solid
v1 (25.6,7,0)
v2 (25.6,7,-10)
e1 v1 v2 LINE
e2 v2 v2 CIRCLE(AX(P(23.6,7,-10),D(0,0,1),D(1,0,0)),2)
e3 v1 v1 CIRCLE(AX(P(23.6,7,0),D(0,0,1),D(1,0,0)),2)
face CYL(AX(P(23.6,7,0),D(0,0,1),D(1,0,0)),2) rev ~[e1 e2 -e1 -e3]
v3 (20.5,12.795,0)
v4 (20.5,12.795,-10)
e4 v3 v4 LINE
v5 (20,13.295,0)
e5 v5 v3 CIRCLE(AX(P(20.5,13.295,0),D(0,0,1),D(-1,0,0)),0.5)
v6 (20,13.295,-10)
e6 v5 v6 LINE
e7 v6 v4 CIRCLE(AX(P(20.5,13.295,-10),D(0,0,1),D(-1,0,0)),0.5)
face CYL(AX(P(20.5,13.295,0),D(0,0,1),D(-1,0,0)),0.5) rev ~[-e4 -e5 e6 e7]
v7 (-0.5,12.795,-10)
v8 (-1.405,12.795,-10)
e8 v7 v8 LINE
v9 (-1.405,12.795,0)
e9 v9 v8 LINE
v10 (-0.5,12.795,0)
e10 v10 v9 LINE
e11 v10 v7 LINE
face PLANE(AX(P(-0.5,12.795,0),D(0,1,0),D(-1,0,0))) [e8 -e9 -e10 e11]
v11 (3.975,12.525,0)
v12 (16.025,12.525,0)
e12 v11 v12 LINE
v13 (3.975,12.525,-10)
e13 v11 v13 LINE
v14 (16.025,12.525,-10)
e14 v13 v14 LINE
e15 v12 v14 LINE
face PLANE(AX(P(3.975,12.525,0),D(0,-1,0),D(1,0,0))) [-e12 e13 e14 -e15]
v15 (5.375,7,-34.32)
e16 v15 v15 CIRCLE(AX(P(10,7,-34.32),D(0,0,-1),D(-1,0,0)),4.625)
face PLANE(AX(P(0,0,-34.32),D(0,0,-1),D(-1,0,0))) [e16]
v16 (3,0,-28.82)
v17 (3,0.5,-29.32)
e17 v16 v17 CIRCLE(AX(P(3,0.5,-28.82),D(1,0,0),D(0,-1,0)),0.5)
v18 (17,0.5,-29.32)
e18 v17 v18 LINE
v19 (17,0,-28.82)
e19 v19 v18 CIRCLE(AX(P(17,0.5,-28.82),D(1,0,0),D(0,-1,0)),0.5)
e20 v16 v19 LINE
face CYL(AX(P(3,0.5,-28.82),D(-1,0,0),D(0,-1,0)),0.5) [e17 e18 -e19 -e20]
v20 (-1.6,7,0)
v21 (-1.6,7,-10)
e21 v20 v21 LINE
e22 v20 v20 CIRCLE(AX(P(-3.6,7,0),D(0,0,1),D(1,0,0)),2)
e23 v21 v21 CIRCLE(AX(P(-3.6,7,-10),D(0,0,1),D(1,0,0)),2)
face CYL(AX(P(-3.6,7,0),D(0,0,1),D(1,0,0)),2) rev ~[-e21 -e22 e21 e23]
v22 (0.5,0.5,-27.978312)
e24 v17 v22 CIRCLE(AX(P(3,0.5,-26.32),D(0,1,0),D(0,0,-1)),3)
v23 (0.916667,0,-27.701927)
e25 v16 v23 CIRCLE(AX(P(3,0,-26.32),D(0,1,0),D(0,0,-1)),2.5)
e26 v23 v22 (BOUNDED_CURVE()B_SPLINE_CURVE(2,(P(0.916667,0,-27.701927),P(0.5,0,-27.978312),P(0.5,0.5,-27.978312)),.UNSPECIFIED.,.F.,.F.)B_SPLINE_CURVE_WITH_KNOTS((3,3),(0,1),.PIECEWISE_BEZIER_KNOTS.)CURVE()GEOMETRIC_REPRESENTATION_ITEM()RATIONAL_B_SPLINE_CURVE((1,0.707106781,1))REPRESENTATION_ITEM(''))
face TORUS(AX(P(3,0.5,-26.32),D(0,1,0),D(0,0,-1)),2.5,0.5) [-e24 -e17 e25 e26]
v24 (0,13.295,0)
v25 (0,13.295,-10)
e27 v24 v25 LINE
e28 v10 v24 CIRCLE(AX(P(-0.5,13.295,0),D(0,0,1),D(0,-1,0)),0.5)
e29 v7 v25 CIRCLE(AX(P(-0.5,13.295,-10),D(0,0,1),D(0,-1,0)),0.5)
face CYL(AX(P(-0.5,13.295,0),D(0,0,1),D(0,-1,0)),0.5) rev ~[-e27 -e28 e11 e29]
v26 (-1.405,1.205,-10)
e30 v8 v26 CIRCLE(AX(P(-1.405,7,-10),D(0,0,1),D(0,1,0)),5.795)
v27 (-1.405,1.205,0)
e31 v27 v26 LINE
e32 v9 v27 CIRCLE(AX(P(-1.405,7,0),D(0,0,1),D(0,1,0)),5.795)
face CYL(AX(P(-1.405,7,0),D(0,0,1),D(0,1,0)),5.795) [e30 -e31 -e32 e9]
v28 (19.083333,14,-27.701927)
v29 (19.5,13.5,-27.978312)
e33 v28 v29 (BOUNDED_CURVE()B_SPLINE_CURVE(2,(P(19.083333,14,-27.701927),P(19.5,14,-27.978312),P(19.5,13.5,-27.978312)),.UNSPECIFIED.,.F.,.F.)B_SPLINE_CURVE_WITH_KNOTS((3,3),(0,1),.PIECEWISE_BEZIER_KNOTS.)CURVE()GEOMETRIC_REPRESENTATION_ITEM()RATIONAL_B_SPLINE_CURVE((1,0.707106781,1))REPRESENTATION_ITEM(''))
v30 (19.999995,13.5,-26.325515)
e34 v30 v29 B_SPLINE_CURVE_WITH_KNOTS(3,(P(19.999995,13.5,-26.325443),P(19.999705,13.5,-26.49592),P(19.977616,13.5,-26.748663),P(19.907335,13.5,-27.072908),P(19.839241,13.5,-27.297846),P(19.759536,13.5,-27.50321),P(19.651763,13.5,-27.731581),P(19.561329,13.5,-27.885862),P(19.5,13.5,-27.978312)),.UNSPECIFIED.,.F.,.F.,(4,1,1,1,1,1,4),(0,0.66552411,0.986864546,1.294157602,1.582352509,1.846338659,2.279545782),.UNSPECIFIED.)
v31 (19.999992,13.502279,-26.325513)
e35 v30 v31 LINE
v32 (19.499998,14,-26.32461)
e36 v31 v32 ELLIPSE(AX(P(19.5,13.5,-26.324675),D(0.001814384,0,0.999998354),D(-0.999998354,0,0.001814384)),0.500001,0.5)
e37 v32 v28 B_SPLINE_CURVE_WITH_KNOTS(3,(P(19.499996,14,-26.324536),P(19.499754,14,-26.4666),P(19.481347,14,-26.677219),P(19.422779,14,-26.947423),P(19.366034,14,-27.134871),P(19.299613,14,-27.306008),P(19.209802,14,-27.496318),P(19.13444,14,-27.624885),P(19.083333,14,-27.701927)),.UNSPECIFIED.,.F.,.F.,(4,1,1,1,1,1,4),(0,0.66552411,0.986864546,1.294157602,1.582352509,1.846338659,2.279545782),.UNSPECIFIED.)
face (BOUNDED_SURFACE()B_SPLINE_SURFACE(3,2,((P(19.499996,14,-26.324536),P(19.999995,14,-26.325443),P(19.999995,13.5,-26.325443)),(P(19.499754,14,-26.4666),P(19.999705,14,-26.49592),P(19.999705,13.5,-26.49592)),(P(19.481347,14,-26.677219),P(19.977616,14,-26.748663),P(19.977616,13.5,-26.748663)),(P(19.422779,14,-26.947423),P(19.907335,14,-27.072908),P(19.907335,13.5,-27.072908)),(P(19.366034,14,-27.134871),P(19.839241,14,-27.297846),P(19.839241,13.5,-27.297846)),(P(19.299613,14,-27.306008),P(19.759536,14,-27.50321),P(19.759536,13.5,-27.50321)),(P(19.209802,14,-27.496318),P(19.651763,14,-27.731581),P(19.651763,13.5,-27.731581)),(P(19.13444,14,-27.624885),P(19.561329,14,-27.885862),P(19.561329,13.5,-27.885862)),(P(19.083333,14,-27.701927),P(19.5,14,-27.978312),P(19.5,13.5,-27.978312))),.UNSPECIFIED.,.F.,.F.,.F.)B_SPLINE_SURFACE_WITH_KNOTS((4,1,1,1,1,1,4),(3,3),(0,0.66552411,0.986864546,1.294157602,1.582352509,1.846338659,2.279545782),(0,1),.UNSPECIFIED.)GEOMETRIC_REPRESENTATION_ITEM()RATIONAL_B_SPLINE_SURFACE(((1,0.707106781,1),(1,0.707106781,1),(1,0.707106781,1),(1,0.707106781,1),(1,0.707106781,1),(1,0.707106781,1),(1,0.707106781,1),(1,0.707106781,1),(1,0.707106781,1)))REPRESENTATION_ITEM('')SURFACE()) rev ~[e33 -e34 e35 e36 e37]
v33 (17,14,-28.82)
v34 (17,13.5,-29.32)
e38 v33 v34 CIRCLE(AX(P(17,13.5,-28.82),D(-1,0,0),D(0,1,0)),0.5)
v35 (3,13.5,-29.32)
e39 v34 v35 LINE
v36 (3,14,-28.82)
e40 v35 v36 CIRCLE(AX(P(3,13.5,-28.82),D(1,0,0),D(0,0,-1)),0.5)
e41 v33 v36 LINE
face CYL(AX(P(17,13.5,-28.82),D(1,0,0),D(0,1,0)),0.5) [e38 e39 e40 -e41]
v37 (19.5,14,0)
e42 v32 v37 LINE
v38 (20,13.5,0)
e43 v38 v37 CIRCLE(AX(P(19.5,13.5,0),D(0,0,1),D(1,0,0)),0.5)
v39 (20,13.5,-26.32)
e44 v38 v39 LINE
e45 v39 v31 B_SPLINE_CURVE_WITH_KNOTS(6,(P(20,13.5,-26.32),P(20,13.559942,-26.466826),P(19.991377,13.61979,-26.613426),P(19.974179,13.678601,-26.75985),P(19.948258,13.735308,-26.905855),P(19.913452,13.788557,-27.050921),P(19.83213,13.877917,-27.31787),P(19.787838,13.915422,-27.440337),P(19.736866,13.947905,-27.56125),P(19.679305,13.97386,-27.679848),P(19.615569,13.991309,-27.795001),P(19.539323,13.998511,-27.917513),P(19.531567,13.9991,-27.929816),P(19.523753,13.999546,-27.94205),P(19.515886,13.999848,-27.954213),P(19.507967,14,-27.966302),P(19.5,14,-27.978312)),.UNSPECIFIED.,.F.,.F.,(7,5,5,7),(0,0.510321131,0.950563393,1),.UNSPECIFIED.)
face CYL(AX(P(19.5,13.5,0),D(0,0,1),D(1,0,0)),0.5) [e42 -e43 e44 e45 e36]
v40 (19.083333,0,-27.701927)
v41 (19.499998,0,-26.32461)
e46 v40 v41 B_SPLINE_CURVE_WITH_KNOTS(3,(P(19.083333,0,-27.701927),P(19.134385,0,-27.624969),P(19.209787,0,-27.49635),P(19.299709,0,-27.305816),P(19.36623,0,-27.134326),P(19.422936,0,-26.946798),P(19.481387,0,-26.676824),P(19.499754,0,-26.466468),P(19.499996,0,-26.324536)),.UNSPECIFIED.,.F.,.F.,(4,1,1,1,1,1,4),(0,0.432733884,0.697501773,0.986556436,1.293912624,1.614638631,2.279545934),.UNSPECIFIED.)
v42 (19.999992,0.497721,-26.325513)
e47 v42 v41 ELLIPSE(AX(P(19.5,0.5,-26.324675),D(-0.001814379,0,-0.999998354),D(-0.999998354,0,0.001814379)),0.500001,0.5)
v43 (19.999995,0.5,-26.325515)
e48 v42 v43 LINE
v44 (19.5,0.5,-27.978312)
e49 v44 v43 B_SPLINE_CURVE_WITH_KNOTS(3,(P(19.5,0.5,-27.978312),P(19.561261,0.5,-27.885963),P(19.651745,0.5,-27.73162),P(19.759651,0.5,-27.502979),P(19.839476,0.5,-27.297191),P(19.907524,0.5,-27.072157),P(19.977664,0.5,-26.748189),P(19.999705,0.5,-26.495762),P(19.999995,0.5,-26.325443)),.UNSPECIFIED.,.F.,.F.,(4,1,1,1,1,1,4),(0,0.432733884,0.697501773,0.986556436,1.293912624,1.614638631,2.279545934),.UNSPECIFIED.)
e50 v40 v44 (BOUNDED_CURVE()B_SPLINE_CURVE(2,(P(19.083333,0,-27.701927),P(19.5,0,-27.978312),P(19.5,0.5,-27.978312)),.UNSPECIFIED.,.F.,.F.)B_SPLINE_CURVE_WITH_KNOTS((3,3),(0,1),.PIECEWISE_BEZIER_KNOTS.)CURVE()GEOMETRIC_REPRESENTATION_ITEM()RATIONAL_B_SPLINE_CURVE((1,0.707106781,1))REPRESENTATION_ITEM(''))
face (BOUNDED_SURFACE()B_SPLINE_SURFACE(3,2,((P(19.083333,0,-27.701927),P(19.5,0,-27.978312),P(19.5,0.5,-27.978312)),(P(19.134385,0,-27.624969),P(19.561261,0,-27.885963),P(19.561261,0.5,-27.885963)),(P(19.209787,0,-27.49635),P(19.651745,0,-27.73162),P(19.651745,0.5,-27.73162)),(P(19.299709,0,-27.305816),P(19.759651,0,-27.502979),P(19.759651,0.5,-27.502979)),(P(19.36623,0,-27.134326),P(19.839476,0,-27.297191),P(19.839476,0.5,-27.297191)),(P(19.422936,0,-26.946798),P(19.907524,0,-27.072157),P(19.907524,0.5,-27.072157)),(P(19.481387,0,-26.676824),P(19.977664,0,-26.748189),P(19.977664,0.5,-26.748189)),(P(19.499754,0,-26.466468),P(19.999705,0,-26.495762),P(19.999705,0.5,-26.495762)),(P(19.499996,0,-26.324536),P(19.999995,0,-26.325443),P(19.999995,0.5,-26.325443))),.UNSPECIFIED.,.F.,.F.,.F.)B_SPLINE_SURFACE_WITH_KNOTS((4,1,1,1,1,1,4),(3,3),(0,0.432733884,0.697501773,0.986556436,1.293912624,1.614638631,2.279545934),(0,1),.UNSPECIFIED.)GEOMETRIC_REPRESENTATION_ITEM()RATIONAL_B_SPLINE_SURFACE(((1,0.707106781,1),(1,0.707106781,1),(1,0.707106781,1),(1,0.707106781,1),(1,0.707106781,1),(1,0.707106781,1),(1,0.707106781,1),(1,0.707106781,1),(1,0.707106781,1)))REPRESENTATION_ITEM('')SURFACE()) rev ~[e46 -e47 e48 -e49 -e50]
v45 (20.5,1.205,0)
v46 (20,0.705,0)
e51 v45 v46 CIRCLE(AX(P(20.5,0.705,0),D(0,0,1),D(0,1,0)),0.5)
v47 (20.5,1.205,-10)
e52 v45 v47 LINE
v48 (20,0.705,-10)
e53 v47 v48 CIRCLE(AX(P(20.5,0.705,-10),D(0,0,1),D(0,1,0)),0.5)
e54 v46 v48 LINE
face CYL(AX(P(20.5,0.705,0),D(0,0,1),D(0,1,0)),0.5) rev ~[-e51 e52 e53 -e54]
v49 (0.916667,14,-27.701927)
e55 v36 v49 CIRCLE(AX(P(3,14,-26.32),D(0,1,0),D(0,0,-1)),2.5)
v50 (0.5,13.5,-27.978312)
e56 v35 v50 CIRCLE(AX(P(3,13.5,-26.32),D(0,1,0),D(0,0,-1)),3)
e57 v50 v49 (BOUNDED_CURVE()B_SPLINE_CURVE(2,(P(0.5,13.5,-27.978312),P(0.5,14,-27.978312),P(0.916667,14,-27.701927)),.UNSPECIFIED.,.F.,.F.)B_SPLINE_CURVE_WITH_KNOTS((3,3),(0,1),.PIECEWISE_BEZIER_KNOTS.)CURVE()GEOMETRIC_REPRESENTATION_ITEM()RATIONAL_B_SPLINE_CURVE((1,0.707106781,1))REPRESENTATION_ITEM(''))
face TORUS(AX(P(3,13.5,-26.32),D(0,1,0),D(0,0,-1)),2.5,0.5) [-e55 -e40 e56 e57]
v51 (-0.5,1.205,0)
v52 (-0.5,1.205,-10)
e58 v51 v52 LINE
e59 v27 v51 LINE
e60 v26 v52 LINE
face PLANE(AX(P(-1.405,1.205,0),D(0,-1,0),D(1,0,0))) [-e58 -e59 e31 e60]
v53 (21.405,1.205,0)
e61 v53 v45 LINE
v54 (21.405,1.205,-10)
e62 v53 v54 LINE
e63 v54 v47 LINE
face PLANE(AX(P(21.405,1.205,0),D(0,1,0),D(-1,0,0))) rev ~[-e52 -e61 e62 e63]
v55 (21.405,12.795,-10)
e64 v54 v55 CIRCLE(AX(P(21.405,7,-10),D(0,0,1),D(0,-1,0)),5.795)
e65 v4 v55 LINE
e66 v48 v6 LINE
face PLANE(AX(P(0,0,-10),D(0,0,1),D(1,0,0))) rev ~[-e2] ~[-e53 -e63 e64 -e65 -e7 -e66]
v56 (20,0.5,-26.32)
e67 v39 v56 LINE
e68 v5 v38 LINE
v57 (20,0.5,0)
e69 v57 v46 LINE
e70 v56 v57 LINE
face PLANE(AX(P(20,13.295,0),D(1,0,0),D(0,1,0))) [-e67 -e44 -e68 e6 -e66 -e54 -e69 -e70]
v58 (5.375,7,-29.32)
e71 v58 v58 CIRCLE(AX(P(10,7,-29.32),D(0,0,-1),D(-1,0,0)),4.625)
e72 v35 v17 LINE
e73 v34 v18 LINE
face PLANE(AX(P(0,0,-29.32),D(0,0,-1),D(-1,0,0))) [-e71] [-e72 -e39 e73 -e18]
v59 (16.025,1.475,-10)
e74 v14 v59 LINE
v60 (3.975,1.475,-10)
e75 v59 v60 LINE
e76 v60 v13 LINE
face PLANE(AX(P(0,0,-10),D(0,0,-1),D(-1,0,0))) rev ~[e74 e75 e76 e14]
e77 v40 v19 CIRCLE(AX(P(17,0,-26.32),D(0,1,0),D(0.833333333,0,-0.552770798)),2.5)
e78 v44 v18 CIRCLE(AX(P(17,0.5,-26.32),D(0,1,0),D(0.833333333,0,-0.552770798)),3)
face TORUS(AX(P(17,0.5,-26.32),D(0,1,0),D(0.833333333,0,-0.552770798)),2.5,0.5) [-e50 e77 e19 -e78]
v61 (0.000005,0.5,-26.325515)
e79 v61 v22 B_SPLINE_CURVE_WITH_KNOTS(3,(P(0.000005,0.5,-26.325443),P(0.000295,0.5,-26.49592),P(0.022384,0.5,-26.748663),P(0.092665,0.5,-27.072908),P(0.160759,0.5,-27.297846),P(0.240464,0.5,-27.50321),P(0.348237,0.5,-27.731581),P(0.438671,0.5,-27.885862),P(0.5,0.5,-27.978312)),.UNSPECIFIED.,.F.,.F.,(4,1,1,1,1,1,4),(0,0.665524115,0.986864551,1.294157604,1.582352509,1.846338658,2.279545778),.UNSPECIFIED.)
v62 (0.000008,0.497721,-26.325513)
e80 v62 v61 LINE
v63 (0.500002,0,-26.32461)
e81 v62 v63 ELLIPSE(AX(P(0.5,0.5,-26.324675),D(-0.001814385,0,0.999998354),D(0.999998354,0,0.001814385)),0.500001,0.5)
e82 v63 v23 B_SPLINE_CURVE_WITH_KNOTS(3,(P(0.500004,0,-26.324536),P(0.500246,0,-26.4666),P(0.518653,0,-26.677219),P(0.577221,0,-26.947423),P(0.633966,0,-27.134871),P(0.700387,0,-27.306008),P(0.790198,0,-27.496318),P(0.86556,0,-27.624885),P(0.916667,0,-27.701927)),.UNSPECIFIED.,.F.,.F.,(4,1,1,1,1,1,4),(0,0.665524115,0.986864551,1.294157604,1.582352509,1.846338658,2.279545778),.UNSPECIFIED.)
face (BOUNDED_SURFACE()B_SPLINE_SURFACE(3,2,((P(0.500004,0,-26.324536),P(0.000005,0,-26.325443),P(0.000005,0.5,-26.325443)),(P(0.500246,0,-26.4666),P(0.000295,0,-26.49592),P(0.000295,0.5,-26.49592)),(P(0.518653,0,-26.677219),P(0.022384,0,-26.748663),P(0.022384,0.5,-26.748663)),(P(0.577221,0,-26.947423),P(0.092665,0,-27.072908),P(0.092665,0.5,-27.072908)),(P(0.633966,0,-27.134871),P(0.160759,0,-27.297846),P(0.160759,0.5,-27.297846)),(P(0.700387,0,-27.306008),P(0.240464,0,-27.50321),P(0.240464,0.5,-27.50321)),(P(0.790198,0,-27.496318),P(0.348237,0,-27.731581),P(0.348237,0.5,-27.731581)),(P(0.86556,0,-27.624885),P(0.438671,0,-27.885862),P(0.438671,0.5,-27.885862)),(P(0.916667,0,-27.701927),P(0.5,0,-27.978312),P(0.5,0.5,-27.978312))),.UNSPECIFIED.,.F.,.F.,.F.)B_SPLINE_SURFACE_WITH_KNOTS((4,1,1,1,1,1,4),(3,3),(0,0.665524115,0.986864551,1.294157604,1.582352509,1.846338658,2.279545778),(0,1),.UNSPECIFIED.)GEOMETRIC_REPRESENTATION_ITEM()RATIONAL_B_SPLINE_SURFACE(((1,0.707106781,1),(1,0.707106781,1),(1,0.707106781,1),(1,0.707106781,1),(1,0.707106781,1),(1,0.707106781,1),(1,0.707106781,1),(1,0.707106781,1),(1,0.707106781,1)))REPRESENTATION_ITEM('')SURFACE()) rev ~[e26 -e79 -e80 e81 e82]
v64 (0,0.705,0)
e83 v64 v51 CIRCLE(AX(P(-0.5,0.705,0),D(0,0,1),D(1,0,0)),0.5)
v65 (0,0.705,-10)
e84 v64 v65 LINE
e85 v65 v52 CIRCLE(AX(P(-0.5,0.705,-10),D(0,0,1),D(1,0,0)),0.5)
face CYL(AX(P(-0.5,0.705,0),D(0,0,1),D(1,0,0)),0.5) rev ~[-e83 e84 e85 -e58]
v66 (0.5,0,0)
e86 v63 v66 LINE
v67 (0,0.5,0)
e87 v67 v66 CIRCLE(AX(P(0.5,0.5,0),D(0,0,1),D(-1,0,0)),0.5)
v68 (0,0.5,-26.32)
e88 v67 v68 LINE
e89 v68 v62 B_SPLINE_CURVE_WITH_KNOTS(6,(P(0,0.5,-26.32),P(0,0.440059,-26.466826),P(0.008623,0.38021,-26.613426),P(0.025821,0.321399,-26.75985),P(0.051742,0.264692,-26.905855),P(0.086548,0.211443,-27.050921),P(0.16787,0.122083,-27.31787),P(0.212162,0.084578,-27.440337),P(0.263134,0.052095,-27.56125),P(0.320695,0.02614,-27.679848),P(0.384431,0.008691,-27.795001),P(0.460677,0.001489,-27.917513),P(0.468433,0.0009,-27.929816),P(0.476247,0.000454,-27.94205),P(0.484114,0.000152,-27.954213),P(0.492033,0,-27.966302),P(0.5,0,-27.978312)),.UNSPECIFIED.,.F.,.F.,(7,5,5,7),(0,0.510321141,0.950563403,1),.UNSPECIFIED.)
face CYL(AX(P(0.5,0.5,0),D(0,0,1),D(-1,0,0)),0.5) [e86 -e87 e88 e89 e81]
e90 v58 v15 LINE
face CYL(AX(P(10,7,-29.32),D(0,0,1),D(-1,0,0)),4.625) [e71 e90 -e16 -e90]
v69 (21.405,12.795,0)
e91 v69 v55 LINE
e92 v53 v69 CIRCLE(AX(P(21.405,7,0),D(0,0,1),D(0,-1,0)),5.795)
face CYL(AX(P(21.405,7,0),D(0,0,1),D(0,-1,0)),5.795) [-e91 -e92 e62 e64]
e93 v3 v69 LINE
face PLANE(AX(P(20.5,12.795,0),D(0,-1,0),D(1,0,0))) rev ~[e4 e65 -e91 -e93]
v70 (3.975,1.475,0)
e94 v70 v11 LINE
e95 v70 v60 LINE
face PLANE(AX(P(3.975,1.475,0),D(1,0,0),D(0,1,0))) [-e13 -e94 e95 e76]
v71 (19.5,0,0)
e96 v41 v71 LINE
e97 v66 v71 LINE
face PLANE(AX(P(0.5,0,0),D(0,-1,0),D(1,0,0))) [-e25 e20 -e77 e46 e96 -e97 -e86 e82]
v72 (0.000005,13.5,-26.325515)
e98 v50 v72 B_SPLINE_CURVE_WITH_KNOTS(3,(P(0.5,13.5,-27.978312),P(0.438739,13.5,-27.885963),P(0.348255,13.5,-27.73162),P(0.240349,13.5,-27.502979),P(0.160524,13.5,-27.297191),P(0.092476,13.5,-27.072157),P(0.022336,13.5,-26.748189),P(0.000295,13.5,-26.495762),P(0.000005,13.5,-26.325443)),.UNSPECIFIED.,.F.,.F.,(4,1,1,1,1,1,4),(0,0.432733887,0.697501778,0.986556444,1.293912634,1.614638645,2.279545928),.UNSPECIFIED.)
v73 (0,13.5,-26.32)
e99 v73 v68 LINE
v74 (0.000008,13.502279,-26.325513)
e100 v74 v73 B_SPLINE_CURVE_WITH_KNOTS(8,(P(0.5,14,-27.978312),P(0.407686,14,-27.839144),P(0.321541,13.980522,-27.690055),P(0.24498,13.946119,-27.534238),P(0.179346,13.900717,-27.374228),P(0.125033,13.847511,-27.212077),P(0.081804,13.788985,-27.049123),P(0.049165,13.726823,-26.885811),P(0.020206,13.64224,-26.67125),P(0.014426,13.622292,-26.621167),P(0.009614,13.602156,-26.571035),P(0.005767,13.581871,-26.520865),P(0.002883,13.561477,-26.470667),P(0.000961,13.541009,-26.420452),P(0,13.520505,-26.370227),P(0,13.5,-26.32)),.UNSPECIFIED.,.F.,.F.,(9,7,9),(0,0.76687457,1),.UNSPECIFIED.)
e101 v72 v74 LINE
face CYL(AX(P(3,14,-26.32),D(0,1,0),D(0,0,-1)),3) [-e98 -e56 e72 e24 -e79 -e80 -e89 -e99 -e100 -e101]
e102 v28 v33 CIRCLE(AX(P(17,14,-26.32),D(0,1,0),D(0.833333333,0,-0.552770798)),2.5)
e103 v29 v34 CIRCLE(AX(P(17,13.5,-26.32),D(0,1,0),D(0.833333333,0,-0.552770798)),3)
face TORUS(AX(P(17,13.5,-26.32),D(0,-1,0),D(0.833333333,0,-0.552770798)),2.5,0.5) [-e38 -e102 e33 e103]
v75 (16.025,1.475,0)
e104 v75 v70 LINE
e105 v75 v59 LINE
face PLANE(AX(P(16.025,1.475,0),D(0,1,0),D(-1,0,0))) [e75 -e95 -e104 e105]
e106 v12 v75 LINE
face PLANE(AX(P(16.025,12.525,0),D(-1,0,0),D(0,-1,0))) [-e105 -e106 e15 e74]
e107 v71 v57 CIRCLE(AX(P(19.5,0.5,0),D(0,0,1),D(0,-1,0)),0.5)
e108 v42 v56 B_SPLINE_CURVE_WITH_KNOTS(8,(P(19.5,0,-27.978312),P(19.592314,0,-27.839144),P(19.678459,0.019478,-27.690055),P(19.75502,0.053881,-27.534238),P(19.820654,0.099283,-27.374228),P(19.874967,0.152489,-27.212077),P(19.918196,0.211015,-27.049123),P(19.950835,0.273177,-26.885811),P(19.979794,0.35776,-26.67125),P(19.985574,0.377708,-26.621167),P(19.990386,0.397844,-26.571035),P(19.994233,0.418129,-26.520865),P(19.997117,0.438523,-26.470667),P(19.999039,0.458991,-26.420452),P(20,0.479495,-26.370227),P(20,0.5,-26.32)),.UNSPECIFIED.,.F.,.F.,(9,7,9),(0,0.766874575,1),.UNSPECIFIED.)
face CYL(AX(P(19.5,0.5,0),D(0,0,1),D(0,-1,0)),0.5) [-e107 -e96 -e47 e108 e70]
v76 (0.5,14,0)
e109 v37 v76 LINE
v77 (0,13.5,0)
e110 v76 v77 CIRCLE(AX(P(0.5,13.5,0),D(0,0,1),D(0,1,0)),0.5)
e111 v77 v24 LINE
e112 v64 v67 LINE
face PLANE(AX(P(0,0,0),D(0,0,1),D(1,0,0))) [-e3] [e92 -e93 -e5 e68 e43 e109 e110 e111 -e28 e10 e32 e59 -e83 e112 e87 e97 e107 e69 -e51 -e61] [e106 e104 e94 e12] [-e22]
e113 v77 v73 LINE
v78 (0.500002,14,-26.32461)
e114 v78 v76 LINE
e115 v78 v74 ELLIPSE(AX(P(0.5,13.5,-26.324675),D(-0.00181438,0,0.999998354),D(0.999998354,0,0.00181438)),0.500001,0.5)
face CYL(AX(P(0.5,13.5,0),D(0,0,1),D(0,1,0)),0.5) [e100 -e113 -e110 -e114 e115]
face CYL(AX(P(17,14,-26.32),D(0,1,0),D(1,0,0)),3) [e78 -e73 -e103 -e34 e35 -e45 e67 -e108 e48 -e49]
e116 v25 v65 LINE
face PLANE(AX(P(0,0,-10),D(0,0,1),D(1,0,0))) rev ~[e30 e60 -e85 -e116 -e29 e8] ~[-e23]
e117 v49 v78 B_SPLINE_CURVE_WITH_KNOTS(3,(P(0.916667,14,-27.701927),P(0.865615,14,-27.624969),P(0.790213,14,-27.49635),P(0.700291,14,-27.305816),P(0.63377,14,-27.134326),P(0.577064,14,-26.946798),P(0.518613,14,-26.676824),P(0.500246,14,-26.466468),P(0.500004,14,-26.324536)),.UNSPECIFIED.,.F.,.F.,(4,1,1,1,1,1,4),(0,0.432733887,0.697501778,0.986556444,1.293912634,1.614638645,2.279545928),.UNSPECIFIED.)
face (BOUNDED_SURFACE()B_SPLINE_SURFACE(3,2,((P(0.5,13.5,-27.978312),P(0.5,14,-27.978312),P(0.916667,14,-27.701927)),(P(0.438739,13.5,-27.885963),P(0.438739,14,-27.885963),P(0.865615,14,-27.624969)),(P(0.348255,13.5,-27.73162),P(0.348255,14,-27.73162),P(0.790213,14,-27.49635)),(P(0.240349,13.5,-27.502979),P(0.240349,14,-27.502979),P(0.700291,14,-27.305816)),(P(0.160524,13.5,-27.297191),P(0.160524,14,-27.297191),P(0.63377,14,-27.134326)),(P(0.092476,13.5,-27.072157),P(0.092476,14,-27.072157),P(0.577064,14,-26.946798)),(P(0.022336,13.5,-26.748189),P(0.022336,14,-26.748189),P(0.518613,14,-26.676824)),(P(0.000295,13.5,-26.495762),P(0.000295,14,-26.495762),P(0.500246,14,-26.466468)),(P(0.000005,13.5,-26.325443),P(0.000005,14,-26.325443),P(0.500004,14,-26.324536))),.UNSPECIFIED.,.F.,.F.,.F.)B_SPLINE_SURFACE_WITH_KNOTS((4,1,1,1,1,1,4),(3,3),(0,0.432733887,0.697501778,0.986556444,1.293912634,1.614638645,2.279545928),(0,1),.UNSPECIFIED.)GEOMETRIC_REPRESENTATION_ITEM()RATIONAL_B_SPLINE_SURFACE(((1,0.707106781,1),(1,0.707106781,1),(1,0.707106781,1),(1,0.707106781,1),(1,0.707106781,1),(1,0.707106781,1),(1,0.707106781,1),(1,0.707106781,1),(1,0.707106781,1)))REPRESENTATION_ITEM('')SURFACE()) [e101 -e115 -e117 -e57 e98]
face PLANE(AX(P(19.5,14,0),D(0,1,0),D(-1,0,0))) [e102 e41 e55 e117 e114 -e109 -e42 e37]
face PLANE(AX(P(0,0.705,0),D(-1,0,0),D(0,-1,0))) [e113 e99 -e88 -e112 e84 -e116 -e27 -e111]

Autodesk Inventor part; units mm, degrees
ref_plane "YZ Plane" through (0, 0, 0) normal (1, 0, 0) x (0, 1, 0)
ref_plane "XZ Plane" through (0, 0, 0) normal (0, 1, 0) x (-1, 0, 0)
ref_plane "XY Plane" through (0, 0, 0) normal (0, 0, 1) x (1, 0, 0)
sketch "Sketch1" plane through (0, 0, 0) normal (0, 0, 1) x (1, 0, 0)
  line L0 (0.5, 0) -> (19.5, 0)
  line L1 (19.5, 14) -> (0.5, 14)
  line L2 (-0.5, 12.795) -> (-1.405, 12.795)
  line L3 (-1.405, 1.205) -> (-0.5, 1.205)
  line L4 (20.5, 12.795) -> (21.405, 12.795)
  line L5 (21.405, 1.205) -> (20.5, 1.205)
  line L6 (0, 13.5) -> (0, 13.295)
  line L7 (0, 0.705) -> (0, 0.5)
  line L8 (20, 0.5) -> (20, 0.705)
  line L9 (20, 13.295) -> (20, 13.5)
  circle A0 centre (-3.6, 7) radius 2
  circle A1 centre (23.6, 7) radius 2
  line L10 (3.975, 12.525) -> (16.025, 12.525)
  line L11 (16.025, 12.525) -> (16.025, 1.475)
  line L12 (16.025, 1.475) -> (3.975, 1.475)
  line L13 (3.975, 1.475) -> (3.975, 12.525)
  arc A2 (0.5, 14) -> (0, 13.5) centre (0.5, 13.5) ccw
  arc A3 (-0.5, 12.795) -> (0, 13.295) centre (-0.5, 13.295) ccw
  arc A4 (20, 13.5) -> (19.5, 14) centre (19.5, 13.5) ccw
  arc A5 (20, 13.295) -> (20.5, 12.795) centre (20.5, 13.295) ccw
  arc A6 (20.5, 1.205) -> (20, 0.705) centre (20.5, 0.705) ccw
  arc A7 (19.5, 0) -> (20, 0.5) centre (19.5, 0.5) ccw
  arc A8 (0, 0.5) -> (0.5, 0) centre (0.5, 0.5) ccw
  arc A9 (0, 0.705) -> (-0.5, 1.205) centre (-0.5, 0.705) ccw
  line L14 (10, 15.3107) -> (10, 19.4603)
  arc A10 (-1.405, 12.795) -> (-1.405, 1.205) centre (-1.405, 7) ccw
  arc A11 (21.405, 1.205) -> (21.405, 12.795) centre (21.405, 7) ccw
  line L15 (-7.2, 7) -> (-7.2, 15.3107)
  point P0 (0, 0)
  point P1 (20, 14)
  point P2 (20, 0)
  point P3 (0, 14)
  point P4 (0, 12.795)
  point P5 (0, 1.205)
  point P6 (20, 12.795)
  point P7 (20, 1.205)
  dimension "d0" = 11.59
  dimension "d1" = 1.205
  dimension "d2" = 4
  dimension "width" = 20
  dimension "height" = 14
  dimension "d7" = 12.05
  dimension "d8" = 11.05
  dimension "d9" = 3.975
  dimension "d10" = 1.475
  dimension "d13" = 0.5
  dimension "d31" = 27.2
  dimension "d32" = 13.6
  dimension "d33" = 10
  dimension "d34" = 34.4
  dimension "d35" = 17.2
extrude "Extrusion1" add sketch "Sketch1" against normal blind 10
sketch "Sketch3" plane through (0, 0, -10) normal (0, 0, -1) x (-1, 0, 0)
  line L0 (-19.5, 14) -> (-0.5, 14)
  line L1 (0, 13.5) -> (0, 0.5)
  line L2 (-0.5, 0) -> (-19.5, 0)
  line L3 (-20, 0.5) -> (-20, 13.5)
  line L4 (-0.5, 0) -> (-19.5, 0) projected
  line L5 (0, 0.5) -> (0, 0.705) projected
  arc A0 (0, 13.5) -> (-0.5, 14) centre (-0.5, 13.5) ccw
  arc A1 (-0.5, 0) -> (0, 0.5) centre (-0.5, 0.5) ccw
  arc A2 (-20, 0.5) -> (-19.5, 0) centre (-19.5, 0.5) ccw
  arc A3 (-19.5, 14) -> (-20, 13.5) centre (-19.5, 13.5) ccw
  point P0 (0, 0)
  point P1 (-20, 14)
  point P2 (0, 0)
  point P3 (0, 14)
  point P4 (-20, 0)
  dimension "d14" = 20
  dimension "d15" = 14
  dimension "d16" = 0
  dimension "d17" = 0
  dimension "d20" = 0.5
extrude "Extrusion2" add sketch "Sketch3" along normal blind 19.32
sketch "Sketch6" plane through (0.5, 14, 0) normal (0, 1, 0) x (1, 0, 0)
  line L0 (-0.5, 0) -> (-0.5, 29.32) projected
  line L1 (-0.5, 29.32) -> (-0.5, 26.32)
  line L2 (-0.5, 29.32) -> (2.5, 29.32)
  arc A0 (2.5, 29.32) -> (-0.5, 26.32) centre (2.5, 26.32) ccw
  line L3 (19.5, 0) -> (19.5, 29.32) projected
  line L4 (19.5, 29.32) -> (19.5, 26.32)
  line L5 (19.5, 29.32) -> (16.5, 29.32)
  line L6 (0, 29.32) -> (19, 29.32) projected
  arc A1 (19.5, 26.32) -> (16.5, 29.32) centre (16.5, 26.32) ccw
  dimension "d36" = 3
extrude "Extrusion4" cut sketch "Sketch6" against normal through all
fillet "Fillet2" radius 0.5 10 edges at (18.4186, 14, -28.9634) (19.8751, 13.8307, -27.1768) (1.5814, 14, -28.9634) (0.1247, 13.8304, -27.176) (10, 14, -29.32) (1.5814, 0, -28.9634) (0.1249, 0.1694, -27.1767) (18.4186, 0, -28.9634) (19.8753, 0.1696, -27.176) (10, 0, -29.32)
sketch "Sketch7" plane through (0, 0, -29.32) normal (0, 0, -1) x (-1, 0, 0)
  circle A0 centre (-10, 7) radius 4.625
  line L0 (-3, 14) -> (-17, 14) projected
  line L1 (-20, 0.5) -> (-20, 13.5) projected
  point P0 (0, 0)
  dimension "d40" = 9.25
  dimension "d41" = 7
  dimension "d42" = 10
extrude "Extrusion5" add sketch "Sketch7" along normal blind 5
equation "\"d1\" = -0.5 * d0 + 0.5 * height"
equation "\"d9\" = -0.5 * d7 + 0.5 * width"
equation "\"d10\" = -0.5 * d8 + 0.5 * height"
equation "\"d32\" = 0.5 * d31"
equation "\"d33\" = 0.5 * width"
equation "\"d35\" = 0.5 * d34"
equation "\"d16\" = -0.5 * d15 + 0.5 * height"
equation "\"d17\" = -0.5 * d14 + 0.5 * width"
equation "\"d41\" = 0.5 * height"
equation "\"d42\" = 0.5 * width"
properties part number "panel-mount"
